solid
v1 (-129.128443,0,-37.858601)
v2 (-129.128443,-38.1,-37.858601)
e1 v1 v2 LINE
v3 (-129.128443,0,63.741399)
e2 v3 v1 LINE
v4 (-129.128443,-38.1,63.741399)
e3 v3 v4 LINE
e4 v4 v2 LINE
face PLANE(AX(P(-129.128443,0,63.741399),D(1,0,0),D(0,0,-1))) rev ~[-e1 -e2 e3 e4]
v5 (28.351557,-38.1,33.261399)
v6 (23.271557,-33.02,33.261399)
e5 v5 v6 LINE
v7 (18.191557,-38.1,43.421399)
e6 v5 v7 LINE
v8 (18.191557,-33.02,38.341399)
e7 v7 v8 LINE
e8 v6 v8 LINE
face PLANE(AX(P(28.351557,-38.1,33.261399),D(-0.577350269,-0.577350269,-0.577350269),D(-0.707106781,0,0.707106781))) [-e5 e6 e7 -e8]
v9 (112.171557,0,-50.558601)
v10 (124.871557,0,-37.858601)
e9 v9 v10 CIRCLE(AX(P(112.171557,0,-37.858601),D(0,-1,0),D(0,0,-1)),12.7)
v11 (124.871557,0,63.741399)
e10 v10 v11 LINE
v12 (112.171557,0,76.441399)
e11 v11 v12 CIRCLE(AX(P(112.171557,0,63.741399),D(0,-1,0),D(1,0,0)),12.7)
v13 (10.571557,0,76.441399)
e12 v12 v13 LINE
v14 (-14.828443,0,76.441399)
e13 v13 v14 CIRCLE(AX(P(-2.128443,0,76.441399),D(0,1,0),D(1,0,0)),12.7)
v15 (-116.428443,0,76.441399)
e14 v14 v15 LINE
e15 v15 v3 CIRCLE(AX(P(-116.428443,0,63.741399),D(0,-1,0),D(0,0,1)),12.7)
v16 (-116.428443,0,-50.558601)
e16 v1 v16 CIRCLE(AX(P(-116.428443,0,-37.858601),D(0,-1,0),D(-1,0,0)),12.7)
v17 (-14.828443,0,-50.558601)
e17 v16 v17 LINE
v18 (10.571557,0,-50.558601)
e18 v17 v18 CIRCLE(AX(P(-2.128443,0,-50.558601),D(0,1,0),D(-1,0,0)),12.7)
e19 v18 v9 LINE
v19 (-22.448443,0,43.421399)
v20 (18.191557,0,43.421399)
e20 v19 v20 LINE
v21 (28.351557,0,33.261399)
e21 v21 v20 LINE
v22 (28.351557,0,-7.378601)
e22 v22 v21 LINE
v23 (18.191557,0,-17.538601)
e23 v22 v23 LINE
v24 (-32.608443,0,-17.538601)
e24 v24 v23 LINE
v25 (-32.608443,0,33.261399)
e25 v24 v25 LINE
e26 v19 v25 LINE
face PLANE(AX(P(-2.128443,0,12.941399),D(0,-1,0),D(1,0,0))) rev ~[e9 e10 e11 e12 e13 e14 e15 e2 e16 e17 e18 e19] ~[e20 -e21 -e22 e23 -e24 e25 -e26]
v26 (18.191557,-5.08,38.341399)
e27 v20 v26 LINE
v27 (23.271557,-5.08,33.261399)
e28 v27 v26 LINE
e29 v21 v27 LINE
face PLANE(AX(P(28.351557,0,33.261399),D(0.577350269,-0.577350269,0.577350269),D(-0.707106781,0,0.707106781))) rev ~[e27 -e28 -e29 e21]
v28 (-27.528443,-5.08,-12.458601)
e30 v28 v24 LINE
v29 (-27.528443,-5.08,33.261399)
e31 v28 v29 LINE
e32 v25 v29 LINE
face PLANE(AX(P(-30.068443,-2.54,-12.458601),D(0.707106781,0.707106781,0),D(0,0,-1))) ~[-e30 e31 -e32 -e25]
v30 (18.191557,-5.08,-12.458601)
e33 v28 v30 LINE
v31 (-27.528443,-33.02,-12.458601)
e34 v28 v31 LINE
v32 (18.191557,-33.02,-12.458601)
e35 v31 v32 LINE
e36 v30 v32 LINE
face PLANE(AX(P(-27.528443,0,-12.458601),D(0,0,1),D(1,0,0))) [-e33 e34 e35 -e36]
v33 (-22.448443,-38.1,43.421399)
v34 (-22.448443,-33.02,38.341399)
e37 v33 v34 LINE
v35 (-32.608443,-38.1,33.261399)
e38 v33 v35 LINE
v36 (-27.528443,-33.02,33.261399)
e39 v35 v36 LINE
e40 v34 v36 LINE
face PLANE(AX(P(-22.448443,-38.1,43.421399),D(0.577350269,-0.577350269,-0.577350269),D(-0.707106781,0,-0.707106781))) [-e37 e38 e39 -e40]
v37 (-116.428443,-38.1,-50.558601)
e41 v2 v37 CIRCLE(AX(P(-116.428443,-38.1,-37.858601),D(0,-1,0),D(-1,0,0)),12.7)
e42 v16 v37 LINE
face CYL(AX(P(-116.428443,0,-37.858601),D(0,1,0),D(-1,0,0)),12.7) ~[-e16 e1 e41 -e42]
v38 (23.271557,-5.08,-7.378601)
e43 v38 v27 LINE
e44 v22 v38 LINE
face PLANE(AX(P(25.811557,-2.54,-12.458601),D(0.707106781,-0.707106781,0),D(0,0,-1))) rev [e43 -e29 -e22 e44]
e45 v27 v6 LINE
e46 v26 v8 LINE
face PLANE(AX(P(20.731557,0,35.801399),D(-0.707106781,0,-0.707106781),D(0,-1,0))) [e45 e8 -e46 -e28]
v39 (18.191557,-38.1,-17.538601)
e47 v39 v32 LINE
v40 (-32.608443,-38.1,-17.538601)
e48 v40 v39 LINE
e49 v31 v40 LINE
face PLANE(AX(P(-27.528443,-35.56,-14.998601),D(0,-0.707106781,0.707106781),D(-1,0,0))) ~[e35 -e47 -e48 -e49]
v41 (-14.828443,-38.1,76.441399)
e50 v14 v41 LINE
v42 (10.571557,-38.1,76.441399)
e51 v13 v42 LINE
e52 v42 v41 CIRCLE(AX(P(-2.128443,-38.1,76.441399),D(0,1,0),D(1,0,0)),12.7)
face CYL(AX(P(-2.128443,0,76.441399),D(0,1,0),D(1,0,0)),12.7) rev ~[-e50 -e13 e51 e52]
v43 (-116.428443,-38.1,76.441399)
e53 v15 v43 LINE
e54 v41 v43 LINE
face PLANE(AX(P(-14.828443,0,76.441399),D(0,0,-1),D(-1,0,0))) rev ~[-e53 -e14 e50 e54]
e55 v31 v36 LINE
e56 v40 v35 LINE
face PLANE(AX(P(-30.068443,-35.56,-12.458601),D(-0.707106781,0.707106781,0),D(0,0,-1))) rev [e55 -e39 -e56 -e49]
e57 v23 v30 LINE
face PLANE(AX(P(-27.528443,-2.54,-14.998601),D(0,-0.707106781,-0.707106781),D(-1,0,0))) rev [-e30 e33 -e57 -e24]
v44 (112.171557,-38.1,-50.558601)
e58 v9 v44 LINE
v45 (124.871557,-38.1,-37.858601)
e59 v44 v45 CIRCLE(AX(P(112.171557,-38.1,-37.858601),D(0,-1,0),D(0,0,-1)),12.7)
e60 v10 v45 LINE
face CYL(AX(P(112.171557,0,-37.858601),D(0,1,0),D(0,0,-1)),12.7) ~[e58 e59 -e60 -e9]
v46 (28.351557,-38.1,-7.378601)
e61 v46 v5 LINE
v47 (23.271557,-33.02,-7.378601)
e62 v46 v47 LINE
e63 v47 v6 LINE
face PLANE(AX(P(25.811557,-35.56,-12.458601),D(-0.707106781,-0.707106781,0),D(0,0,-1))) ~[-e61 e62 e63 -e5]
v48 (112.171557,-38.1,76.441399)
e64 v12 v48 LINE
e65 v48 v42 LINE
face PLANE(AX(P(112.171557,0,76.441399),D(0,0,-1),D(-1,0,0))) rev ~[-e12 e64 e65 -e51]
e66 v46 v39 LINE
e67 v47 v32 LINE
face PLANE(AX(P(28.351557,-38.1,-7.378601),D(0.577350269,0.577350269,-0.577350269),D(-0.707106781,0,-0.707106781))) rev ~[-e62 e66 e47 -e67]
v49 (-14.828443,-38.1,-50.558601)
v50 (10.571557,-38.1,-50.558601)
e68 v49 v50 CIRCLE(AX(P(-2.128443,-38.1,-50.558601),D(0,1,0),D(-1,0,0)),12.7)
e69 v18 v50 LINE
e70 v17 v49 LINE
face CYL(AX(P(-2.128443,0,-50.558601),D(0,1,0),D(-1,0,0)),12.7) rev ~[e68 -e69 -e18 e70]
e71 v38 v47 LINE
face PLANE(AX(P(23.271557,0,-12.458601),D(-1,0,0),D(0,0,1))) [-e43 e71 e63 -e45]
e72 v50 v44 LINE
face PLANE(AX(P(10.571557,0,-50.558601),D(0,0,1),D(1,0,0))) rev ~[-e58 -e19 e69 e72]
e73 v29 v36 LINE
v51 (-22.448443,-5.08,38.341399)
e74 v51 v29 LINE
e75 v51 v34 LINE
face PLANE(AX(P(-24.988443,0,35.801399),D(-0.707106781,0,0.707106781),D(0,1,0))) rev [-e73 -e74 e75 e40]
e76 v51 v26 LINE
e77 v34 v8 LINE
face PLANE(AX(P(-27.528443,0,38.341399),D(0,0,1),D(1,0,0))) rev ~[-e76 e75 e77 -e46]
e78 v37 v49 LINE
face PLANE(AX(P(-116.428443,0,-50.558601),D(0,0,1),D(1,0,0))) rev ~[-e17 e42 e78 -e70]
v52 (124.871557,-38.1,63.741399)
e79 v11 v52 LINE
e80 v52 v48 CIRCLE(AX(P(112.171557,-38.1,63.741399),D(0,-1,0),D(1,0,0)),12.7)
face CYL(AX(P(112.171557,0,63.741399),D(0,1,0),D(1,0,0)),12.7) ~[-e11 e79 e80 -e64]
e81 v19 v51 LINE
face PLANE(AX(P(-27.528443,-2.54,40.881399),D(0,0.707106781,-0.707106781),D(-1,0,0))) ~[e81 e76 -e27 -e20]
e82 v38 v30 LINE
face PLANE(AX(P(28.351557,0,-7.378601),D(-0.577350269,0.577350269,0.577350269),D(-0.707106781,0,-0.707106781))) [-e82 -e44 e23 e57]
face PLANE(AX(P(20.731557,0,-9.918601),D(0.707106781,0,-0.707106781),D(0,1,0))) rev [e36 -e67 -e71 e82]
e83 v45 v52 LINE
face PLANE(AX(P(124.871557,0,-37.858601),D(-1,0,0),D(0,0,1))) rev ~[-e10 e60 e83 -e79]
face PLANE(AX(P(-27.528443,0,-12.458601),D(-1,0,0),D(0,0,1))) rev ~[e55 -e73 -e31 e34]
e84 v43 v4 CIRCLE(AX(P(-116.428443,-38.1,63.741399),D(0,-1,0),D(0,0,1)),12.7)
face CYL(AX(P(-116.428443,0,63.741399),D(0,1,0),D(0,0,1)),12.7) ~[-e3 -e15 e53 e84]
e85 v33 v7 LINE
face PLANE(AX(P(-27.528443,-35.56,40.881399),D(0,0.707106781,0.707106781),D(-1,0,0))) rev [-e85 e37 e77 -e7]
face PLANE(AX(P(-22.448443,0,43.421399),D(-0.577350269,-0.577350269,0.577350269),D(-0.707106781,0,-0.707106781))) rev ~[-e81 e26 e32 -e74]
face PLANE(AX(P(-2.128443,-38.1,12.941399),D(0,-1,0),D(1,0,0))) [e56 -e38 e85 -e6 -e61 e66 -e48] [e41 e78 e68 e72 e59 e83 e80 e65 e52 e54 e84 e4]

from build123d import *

# Parameters (mm, degrees)
F0_W     = 50.8
F0_H     = 50.8
F1_DEPTH = 38.1
F2_SIZE  = 5.08


with BuildPart() as f1:
    # F0 (on Front) → F1 (new body)
    with BuildSketch(Plane.XZ):
        with BuildLine():
            Line((-14.8284427494, 76.4413994114), (-116.4284427494, 76.4413994114))
            ThreePointArc((-116.4284427494, 76.4413994114), (-125.4086988705, 72.7216555324), (-129.1284427494, 63.7413994114))
            Line((-129.1284427494, 63.7413994114), (-129.1284427494, -37.8586005886))
            ThreePointArc((-129.1284427494, -37.8586005886), (-125.4086988705, -46.8388567097), (-116.4284427494, -50.5586005886))
            Line((-116.4284427494, -50.5586005886), (-14.8284427494, -50.5586005886))
            ThreePointArc((-14.8284427494, -50.5586005886), (-2.1284427494, -37.8586005886), (10.5715572506, -50.5586005886))
            Line((10.5715572506, -50.5586005886), (112.1715572506, -50.5586005886))
            ThreePointArc((112.1715572506, -50.5586005886), (121.1518133717, -46.8388567097), (124.8715572506, -37.8586005886))
            Line((124.8715572506, -37.8586005886), (124.8715572506, 63.7413994114))
            ThreePointArc((124.8715572506, 63.7413994114), (121.1518133717, 72.7216555324), (112.1715572506, 76.4413994114))
            Line((112.1715572506, 76.4413994114), (10.5715572506, 76.4413994114))
            ThreePointArc((10.5715572506, 76.4413994114), (-2.1284427494, 63.7413994114), (-14.8284427494, 76.4413994114))
        make_face()
        with Locations((-2.1284427494, 12.9413994114)):
            Rectangle(F0_W, F0_H, mode=Mode.SUBTRACT)
    extrude(amount=F1_DEPTH)

    # F2
    f2_edges = [f1.edges().sort_by_distance(p)[0] for p in [
        (23.271557, -19.05, 38.341399),
        (23.271557, -19.05, -12.458601),
        (23.271557, 0, 12.941399),
        (23.271557, -38.1, 12.941399),
        (-27.528443, -19.05, 38.341399),
        (-2.128443, 0, 38.341399),
        (-2.128443, -38.1, 38.341399),
        (-27.528443, 0, 12.941399),
        (-27.528443, -38.1, 12.941399),
        (-2.128443, 0, -12.458601),
        (-2.128443, -38.1, -12.458601),
    ]]
    chamfer(f2_edges, length=F2_SIZE)


solid = f1.part
